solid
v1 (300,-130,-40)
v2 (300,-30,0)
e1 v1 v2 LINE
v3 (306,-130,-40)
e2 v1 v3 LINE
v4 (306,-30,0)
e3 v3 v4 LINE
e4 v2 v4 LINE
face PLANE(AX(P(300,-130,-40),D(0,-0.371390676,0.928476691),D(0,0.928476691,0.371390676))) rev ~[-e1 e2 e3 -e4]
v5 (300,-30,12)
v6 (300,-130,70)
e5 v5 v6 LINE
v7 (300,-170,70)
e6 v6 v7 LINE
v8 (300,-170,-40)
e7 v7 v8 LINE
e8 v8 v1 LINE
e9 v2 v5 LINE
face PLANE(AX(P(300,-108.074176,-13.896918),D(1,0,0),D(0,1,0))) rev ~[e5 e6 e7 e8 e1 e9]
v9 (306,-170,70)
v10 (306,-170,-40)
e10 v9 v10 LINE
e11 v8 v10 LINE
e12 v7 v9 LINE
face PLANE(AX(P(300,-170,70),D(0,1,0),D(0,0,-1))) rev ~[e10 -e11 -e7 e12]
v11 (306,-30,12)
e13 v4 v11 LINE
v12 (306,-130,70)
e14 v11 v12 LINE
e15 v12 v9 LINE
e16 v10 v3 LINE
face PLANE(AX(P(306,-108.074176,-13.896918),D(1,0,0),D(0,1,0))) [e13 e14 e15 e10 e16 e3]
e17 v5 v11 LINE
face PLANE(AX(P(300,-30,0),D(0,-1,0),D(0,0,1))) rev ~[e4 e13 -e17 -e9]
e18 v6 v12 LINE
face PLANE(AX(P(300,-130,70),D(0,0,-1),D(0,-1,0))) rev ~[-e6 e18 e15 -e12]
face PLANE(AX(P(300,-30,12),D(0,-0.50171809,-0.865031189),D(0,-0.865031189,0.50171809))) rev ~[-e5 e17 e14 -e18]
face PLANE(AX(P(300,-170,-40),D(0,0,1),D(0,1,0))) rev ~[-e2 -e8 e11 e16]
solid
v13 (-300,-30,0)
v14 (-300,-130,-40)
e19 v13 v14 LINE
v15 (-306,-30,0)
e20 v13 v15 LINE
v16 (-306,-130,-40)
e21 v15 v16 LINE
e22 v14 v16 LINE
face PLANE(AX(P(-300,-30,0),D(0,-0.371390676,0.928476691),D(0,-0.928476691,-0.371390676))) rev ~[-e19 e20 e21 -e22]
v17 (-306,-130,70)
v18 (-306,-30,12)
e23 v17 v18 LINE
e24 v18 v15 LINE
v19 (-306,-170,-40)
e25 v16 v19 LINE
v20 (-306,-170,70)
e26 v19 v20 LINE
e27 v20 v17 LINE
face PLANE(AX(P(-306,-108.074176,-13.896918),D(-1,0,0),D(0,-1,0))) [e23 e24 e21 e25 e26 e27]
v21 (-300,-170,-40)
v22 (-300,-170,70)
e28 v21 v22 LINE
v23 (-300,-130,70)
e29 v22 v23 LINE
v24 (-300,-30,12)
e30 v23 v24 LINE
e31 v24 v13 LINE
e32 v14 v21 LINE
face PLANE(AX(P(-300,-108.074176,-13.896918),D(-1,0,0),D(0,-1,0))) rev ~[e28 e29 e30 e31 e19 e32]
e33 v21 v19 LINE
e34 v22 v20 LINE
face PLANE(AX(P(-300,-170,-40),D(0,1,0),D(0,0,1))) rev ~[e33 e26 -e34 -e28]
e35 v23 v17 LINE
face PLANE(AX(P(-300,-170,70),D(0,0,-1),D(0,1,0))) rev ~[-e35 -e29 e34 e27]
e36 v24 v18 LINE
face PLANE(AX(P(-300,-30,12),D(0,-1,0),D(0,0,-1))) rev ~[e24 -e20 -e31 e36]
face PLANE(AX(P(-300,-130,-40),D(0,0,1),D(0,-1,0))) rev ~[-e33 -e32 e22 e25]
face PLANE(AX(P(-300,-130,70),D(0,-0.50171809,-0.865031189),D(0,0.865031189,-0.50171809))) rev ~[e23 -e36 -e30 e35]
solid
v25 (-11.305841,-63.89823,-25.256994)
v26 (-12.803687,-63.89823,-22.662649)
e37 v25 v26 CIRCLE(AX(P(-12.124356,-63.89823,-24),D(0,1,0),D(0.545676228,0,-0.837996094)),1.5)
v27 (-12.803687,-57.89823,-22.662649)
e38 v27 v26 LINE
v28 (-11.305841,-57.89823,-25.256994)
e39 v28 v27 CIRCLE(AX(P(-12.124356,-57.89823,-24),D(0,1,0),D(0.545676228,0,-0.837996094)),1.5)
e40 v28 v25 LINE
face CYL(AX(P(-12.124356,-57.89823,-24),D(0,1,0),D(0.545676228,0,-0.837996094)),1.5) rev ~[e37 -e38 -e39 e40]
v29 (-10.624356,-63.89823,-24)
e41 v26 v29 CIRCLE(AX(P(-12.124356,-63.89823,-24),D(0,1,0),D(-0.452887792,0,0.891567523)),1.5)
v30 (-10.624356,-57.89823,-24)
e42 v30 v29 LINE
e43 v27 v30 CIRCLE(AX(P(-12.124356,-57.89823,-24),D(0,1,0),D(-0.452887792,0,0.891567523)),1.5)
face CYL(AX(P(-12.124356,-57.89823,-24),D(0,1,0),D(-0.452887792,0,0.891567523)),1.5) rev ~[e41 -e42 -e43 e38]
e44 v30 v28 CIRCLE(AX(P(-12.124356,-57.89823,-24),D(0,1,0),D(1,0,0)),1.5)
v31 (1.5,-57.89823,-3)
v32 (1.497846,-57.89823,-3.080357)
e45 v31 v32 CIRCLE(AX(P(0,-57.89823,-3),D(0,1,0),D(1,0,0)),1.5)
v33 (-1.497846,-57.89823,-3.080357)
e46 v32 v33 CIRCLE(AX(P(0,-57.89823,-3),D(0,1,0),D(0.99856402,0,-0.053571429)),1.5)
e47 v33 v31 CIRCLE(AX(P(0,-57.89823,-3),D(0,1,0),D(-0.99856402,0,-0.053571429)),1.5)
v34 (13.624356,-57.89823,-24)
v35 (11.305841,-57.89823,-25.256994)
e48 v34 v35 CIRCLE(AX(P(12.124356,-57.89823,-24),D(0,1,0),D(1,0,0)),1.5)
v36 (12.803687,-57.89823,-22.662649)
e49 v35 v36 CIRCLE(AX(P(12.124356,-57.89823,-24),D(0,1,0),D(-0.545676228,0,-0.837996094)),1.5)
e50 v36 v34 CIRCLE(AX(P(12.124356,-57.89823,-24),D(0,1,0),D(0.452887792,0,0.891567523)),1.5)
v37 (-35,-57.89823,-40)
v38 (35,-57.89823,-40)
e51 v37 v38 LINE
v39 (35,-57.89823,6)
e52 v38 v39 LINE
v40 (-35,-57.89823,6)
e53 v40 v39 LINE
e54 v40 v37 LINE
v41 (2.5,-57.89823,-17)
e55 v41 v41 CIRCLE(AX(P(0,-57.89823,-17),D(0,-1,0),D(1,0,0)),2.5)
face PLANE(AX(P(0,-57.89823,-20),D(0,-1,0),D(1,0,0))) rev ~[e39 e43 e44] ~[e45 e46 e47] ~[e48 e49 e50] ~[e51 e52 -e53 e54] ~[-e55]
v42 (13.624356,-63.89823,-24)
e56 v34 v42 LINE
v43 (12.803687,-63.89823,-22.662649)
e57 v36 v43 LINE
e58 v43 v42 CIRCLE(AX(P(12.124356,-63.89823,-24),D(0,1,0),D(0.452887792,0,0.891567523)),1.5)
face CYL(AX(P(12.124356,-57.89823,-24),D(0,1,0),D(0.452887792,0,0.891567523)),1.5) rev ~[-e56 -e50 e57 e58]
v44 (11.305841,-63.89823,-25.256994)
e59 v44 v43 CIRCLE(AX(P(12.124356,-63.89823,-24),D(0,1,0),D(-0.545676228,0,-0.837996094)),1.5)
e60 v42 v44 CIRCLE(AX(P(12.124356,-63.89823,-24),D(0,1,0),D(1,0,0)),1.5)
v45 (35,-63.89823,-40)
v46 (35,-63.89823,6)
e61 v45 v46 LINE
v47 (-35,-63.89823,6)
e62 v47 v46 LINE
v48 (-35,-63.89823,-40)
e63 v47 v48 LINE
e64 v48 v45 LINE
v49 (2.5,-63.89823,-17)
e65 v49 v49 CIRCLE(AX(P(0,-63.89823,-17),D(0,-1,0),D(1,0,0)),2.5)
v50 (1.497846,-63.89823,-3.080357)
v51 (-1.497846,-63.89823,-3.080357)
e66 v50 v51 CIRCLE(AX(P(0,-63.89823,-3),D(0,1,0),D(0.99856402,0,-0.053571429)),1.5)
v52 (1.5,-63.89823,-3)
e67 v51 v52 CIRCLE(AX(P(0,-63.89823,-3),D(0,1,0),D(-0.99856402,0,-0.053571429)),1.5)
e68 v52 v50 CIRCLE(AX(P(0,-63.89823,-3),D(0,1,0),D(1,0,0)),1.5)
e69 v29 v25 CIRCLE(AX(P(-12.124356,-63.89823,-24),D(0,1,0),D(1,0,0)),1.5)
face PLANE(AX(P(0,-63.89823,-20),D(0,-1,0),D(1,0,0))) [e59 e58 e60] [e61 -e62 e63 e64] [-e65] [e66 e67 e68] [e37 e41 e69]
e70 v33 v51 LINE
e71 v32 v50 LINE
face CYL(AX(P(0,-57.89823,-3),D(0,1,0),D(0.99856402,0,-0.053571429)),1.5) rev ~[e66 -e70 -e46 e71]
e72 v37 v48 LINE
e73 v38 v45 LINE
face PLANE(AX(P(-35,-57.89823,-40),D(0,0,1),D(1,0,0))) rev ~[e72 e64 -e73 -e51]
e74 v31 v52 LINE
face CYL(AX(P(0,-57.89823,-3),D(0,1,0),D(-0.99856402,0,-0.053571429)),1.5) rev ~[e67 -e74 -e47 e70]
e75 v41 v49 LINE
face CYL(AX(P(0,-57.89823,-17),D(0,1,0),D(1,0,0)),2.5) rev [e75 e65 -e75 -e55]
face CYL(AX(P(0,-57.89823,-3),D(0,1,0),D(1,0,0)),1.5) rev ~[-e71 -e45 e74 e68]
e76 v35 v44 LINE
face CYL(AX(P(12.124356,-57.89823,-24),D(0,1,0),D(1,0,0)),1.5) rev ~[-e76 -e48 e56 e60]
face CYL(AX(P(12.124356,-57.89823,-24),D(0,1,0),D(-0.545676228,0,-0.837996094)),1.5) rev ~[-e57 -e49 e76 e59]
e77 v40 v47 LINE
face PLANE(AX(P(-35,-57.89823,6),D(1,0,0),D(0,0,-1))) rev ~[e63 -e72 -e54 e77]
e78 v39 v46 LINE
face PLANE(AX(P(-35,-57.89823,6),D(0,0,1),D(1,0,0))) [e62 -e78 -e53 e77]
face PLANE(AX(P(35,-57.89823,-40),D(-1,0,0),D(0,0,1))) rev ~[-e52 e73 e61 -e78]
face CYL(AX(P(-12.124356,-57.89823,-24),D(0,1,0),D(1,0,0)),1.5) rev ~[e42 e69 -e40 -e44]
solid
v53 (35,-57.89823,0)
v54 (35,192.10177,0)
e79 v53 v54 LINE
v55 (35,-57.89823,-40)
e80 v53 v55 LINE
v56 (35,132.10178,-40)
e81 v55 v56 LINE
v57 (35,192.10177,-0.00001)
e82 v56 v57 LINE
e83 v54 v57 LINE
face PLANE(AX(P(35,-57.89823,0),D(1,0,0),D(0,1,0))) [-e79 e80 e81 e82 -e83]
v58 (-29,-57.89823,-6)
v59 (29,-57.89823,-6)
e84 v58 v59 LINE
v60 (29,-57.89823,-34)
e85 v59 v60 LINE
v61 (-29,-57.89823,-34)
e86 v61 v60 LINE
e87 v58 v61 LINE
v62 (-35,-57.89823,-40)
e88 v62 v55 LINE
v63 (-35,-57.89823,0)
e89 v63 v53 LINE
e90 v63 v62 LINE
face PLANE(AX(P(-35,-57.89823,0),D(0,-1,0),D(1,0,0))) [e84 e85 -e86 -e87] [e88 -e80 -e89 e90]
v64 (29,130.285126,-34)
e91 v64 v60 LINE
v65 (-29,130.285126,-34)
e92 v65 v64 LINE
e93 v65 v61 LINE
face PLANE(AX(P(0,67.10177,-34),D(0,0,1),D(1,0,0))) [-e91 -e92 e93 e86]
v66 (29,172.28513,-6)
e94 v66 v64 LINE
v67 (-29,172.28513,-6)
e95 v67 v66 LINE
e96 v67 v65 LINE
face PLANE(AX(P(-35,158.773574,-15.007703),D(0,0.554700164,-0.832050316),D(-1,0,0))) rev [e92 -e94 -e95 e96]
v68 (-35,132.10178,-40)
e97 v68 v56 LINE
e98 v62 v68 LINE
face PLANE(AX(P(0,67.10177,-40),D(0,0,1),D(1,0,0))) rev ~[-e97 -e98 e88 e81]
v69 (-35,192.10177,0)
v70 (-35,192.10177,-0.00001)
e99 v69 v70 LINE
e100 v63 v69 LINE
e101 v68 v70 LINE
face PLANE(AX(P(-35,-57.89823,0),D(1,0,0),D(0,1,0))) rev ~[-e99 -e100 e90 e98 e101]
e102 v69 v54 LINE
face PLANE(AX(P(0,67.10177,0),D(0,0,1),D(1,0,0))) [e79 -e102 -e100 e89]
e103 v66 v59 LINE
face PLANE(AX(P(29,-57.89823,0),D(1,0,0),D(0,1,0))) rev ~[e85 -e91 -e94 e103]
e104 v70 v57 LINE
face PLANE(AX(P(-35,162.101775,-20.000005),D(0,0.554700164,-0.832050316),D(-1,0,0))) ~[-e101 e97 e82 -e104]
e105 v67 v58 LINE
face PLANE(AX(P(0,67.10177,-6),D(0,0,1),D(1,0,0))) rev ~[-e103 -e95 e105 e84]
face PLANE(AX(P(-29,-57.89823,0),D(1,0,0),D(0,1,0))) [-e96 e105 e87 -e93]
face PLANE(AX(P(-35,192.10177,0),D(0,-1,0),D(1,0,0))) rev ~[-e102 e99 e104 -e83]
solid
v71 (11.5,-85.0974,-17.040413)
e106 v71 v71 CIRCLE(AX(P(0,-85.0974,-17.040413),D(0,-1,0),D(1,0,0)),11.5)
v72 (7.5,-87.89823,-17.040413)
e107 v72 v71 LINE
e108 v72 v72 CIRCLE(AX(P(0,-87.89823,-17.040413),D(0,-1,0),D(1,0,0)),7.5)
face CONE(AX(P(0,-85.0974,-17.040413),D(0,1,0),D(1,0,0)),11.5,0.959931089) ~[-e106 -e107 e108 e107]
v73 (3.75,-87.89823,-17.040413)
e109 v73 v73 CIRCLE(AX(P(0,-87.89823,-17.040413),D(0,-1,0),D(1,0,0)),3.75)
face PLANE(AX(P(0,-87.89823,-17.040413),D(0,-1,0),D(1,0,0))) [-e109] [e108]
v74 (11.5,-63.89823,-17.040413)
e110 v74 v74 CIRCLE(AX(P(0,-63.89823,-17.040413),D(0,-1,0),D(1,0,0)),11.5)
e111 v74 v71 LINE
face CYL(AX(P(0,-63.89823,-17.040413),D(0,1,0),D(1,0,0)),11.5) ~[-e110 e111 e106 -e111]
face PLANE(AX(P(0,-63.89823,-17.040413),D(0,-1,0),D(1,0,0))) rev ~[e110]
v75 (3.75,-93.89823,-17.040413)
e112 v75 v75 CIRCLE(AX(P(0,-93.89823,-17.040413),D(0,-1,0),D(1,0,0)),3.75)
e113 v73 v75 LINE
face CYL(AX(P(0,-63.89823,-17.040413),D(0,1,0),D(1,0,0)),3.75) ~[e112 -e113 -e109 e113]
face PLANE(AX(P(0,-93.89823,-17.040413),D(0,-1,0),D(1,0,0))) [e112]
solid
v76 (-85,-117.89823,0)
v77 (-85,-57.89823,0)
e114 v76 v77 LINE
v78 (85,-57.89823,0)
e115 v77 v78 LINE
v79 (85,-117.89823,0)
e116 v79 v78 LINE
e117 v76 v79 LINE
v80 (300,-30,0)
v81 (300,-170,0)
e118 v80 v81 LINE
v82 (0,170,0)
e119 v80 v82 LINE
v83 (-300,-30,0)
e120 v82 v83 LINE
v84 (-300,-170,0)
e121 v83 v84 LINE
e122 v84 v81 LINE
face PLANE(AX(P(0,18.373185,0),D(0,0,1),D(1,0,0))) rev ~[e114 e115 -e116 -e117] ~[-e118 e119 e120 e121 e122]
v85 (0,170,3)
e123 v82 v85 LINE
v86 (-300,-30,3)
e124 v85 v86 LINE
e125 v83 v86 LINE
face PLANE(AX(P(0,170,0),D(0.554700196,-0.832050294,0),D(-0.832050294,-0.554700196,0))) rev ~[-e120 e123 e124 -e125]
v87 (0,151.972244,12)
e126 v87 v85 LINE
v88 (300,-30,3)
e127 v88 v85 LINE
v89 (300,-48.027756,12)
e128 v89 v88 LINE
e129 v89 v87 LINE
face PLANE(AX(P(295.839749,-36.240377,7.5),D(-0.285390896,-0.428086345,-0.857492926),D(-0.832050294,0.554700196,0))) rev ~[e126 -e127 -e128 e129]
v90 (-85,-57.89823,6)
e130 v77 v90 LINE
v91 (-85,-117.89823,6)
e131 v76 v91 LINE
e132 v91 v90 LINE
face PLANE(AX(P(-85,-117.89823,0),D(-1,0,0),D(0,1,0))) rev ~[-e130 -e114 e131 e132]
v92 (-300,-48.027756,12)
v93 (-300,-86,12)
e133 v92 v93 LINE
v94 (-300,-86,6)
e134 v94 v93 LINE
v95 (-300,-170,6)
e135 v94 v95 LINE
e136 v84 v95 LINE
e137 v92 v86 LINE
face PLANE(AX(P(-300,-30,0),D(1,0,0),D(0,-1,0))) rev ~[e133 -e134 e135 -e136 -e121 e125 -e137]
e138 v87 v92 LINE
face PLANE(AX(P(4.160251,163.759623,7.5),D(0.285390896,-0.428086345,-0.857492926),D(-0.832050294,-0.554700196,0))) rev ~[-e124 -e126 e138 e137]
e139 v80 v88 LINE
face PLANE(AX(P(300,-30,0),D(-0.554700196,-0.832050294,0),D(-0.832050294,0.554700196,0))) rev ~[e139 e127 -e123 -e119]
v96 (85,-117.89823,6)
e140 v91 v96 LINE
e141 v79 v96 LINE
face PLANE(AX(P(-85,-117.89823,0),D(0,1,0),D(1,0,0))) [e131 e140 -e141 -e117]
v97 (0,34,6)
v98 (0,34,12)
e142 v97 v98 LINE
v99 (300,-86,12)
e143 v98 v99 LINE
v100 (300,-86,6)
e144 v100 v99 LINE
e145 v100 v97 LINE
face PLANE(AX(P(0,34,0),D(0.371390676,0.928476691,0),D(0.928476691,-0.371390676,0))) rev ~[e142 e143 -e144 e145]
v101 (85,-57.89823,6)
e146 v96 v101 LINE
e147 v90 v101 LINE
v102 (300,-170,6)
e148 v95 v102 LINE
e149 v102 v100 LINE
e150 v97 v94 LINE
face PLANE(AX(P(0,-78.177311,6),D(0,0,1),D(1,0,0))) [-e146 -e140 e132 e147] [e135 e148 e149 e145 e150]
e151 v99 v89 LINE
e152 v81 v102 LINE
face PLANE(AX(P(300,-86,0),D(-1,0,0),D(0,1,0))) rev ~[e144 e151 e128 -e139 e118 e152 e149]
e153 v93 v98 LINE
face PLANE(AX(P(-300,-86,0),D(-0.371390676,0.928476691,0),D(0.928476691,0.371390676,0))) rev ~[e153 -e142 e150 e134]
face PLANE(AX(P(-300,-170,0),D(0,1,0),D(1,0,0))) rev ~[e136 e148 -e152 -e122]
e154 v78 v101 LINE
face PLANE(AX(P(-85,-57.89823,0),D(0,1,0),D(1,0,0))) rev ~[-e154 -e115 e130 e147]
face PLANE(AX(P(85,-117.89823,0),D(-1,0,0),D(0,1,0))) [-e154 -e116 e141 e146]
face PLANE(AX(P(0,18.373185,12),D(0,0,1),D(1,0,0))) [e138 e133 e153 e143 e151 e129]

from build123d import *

# Parameters (mm, degrees)
F0_W      = 170
F0_H      = 60
F0_W_2    = 300
F0_H_2    = 40
F1_DEPTH  = 6
F2_DEPTH  = 12
F3_SIZE2  = 9
F3_SIZE   = 15
F4_W      = 70
F4_H      = 250
F5_DEPTH  = 40
F6_SIZE2  = 39.99999
F6_SIZE   = 59.99999
F8_DEPTH  = 6
F10_DEPTH = 6
F11_W     = 70
F11_H     = 40
F11_H_2   = 6
F11_R     = 2.5
F12_DEPTH = 6
F13_R     = 11.5
F13_R_2   = 3.75
F14_DEPTH = 24
F15_SIZE2 = 2.8008301528
F15_SIZE  = 4
F13_R_3   = 2.5
F16_DEPTH = 30
F17_T     = -6


# Not quite as in the source:
# - a fillet or chamfer is up to 0.001 mm smaller than in the source, because OpenCascade refuses the exact size
# - a feature names something its author has since deleted; it is built from what else it names


with BuildPart() as f1:
    # F0 (on Top) → F1 (new body)
    with BuildSketch(Plane.XY):
        Polygon((-300, -86), (-300, -130), (0, -130), (300, -130), (300, -86), (0, 34), align=None)
        with Locations((0, -87.89823)):
            Rectangle(F0_W, F0_H, mode=Mode.SUBTRACT)
        with Locations((-150, -150)):
            Rectangle(F0_W_2, F0_H_2)
        with Locations((150, -150)):
            Rectangle(F0_W_2, F0_H_2)
    extrude(amount=F1_DEPTH)

    # F0 (on Top) → F2 (join)
    with BuildSketch(Plane.XY):
        Polygon((-300, -30), (-300, -86), (0, 34), (300, -86), (300, -30), (0, 170), align=None)
    extrude(amount=F2_DEPTH)

    # F3
    f3_edges = [f1.edges().sort_by_distance(p)[0] for p in [
        (-150, 70, 12),
        (150, 70, 12),
    ]]
    f3_side = f1.faces().sort_by_distance((-293.476688, -58, 12))[0]
    chamfer(f3_edges, length=F3_SIZE, length2=F3_SIZE2, reference=f3_side)


with BuildPart() as f5:
    # F4 (on face) → F5 (new body)
    with BuildSketch(Plane.XY):
        with Locations((0, 67.10177)):
            Rectangle(F4_W, F4_H)
    extrude(amount=-F5_DEPTH)

    # F6 (size 60 and 40 in the source; OpenCascade refuses exactly that, so slightly less here)
    f6_edges = [f5.edges().sort_by_distance(p)[0] for p in [
        (0, 192.10177, -40),
    ]]
    f6_side = f5.faces().sort_by_distance((0, 67.10177, -40))[0]
    chamfer(f6_edges, length=F6_SIZE, length2=F6_SIZE2, reference=f6_side)

    # F17
    f17_openings = [f5.faces().sort_by_distance(p)[0] for p in [
        (0, -57.89823, -20),
    ]]
    offset(amount=F17_T, openings=f17_openings)


with BuildPart() as f8:
    # F7 (on face) → F8 (new body)
    with BuildSketch(Plane.YZ.offset(300)):
        Polygon((-30, 0), (-170, 0), (-170, -40), (-130, -40), align=None)
        Polygon((-130, 70), (-170, 70), (-170, 6), (-86, 6), (-86, 12), (-48.0277563773, 12), (-30, 3), (-30, 12), align=None)
        Polygon((-86, 6), (-170, 6), (-170, 0), (-30, 0), (-30, 3), (-48.0277563773, 12), (-86, 12), align=None)
    extrude(amount=F8_DEPTH)


with BuildPart() as f10:
    # F9 (on face) → F10 (new body)
    with BuildSketch(Plane(origin=(-300, 0, 0), x_dir=(0, -1, 0), z_dir=(-1, 0, 0))):
        Polygon((170, -40), (170, 0), (30, 0), (130, -40), align=None)
        Polygon((86, 6), (170, 6), (170, 70), (130, 70), (30, 12), (30, 3), (48.0277563773, 12), (86, 12), align=None)
        Polygon((30, 0), (170, 0), (170, 6), (86, 6), (86, 12), (48.0277563773, 12), (30, 3), align=None)
    extrude(amount=F10_DEPTH)


with BuildPart() as f12:
    # F11 (on face) → F12 (new body)
    with BuildSketch(Plane.XZ.offset(57.89823)):
        with Locations((0, -20)):
            Rectangle(F11_W, F11_H)
        with BuildLine():
            ThreePointArc((1.49784603, -3.0803571429), (10.4156095458, -7.645050626), (14, -17))
            ThreePointArc((14, -17), (13.6976571495, -19.8938190361), (12.8036873409, -22.6626487156))
            ThreePointArc((12.8036873409, -22.6626487156), (13.4028308252, -23.2154611329), (13.624355653, -24))
            ThreePointArc((13.624355653, -24), (12.8392781966, -25.3186681753), (11.3058413109, -25.2569941415))
            ThreePointArc((11.3058413109, -25.2569941415), (0, -31), (-11.3058413109, -25.2569941415))
            ThreePointArc((-11.3058413109, -25.2569941415), (-13.4233937587, -24.75), (-12.8036873409, -22.6626487156))
            ThreePointArc((-12.8036873409, -22.6626487156), (-12.124355653, -10), (-1.49784603, -3.0803571429))
            ThreePointArc((-1.49784603, -3.0803571429), (-0.0401930031, -1.5005385892), (1.5, -3))
            ThreePointArc((1.5, -3), (1.4994614108, -3.0401930031), (1.49784603, -3.0803571429))
        make_face(mode=Mode.SUBTRACT)
        with Locations((0, 3)):
            Rectangle(F11_W, F11_H_2)
        with BuildLine():
            ThreePointArc((12.8036873409, -22.6626487156), (13.6976571495, -19.8938190361), (14, -17))
            ThreePointArc((14, -17), (10.4156095458, -7.645050626), (1.49784603, -3.0803571429))
            ThreePointArc((1.49784603, -3.0803571429), (0, -4.5), (-1.49784603, -3.0803571429))
            ThreePointArc((-1.49784603, -3.0803571429), (-12.124355653, -10), (-12.8036873409, -22.6626487156))
            ThreePointArc((-12.8036873409, -22.6626487156), (-11.3398167858, -22.7215248278), (-10.624355653, -24))
            ThreePointArc((-10.624355653, -24), (-10.8056874777, -24.7149225437), (-11.3058413109, -25.2569941415))
            ThreePointArc((-11.3058413109, -25.2569941415), (0, -31), (11.3058413109, -25.2569941415))
            ThreePointArc((11.3058413109, -25.2569941415), (10.8253175473, -23.25), (12.8036873409, -22.6626487156))
        make_face()
        with Locations((0, -17)):
            Circle(F11_R, mode=Mode.SUBTRACT)
    extrude(amount=F12_DEPTH)


with BuildPart() as f14:
    # F13 (on face) → F14 (new body)
    with BuildSketch(Plane.XZ.offset(63.89823)):
        with Locations((0, -17.040412873)):
            Circle(F13_R)
        with Locations((0, -17.040412873)):
            Circle(F13_R_2, mode=Mode.SUBTRACT)
    extrude(amount=F14_DEPTH)

    # F15
    f15_edges = [f14.edges().sort_by_distance(p)[0] for p in [
        (-11.5, -87.89823, -17.040413),
    ]]
    f15_side = f14.faces().sort_by_distance((-11.174731, -87.89823, -17.040413))[0]
    chamfer(f15_edges, length=F15_SIZE, length2=F15_SIZE2, reference=f15_side)

    # F13 (on face) → F16 (join)
    with BuildSketch(Plane.XZ.offset(63.89823)):
        with Locations((0, -17.040412873)):
            Circle(F13_R_2)
        with Locations((0, -17)):
            Circle(F13_R_3, mode=Mode.SUBTRACT)
        with Locations((0, -17)):
            Circle(F13_R_3)
    extrude(amount=F16_DEPTH)


solid = Compound([f1.part, f5.part, f8.part, f10.part, f12.part, f14.part])
